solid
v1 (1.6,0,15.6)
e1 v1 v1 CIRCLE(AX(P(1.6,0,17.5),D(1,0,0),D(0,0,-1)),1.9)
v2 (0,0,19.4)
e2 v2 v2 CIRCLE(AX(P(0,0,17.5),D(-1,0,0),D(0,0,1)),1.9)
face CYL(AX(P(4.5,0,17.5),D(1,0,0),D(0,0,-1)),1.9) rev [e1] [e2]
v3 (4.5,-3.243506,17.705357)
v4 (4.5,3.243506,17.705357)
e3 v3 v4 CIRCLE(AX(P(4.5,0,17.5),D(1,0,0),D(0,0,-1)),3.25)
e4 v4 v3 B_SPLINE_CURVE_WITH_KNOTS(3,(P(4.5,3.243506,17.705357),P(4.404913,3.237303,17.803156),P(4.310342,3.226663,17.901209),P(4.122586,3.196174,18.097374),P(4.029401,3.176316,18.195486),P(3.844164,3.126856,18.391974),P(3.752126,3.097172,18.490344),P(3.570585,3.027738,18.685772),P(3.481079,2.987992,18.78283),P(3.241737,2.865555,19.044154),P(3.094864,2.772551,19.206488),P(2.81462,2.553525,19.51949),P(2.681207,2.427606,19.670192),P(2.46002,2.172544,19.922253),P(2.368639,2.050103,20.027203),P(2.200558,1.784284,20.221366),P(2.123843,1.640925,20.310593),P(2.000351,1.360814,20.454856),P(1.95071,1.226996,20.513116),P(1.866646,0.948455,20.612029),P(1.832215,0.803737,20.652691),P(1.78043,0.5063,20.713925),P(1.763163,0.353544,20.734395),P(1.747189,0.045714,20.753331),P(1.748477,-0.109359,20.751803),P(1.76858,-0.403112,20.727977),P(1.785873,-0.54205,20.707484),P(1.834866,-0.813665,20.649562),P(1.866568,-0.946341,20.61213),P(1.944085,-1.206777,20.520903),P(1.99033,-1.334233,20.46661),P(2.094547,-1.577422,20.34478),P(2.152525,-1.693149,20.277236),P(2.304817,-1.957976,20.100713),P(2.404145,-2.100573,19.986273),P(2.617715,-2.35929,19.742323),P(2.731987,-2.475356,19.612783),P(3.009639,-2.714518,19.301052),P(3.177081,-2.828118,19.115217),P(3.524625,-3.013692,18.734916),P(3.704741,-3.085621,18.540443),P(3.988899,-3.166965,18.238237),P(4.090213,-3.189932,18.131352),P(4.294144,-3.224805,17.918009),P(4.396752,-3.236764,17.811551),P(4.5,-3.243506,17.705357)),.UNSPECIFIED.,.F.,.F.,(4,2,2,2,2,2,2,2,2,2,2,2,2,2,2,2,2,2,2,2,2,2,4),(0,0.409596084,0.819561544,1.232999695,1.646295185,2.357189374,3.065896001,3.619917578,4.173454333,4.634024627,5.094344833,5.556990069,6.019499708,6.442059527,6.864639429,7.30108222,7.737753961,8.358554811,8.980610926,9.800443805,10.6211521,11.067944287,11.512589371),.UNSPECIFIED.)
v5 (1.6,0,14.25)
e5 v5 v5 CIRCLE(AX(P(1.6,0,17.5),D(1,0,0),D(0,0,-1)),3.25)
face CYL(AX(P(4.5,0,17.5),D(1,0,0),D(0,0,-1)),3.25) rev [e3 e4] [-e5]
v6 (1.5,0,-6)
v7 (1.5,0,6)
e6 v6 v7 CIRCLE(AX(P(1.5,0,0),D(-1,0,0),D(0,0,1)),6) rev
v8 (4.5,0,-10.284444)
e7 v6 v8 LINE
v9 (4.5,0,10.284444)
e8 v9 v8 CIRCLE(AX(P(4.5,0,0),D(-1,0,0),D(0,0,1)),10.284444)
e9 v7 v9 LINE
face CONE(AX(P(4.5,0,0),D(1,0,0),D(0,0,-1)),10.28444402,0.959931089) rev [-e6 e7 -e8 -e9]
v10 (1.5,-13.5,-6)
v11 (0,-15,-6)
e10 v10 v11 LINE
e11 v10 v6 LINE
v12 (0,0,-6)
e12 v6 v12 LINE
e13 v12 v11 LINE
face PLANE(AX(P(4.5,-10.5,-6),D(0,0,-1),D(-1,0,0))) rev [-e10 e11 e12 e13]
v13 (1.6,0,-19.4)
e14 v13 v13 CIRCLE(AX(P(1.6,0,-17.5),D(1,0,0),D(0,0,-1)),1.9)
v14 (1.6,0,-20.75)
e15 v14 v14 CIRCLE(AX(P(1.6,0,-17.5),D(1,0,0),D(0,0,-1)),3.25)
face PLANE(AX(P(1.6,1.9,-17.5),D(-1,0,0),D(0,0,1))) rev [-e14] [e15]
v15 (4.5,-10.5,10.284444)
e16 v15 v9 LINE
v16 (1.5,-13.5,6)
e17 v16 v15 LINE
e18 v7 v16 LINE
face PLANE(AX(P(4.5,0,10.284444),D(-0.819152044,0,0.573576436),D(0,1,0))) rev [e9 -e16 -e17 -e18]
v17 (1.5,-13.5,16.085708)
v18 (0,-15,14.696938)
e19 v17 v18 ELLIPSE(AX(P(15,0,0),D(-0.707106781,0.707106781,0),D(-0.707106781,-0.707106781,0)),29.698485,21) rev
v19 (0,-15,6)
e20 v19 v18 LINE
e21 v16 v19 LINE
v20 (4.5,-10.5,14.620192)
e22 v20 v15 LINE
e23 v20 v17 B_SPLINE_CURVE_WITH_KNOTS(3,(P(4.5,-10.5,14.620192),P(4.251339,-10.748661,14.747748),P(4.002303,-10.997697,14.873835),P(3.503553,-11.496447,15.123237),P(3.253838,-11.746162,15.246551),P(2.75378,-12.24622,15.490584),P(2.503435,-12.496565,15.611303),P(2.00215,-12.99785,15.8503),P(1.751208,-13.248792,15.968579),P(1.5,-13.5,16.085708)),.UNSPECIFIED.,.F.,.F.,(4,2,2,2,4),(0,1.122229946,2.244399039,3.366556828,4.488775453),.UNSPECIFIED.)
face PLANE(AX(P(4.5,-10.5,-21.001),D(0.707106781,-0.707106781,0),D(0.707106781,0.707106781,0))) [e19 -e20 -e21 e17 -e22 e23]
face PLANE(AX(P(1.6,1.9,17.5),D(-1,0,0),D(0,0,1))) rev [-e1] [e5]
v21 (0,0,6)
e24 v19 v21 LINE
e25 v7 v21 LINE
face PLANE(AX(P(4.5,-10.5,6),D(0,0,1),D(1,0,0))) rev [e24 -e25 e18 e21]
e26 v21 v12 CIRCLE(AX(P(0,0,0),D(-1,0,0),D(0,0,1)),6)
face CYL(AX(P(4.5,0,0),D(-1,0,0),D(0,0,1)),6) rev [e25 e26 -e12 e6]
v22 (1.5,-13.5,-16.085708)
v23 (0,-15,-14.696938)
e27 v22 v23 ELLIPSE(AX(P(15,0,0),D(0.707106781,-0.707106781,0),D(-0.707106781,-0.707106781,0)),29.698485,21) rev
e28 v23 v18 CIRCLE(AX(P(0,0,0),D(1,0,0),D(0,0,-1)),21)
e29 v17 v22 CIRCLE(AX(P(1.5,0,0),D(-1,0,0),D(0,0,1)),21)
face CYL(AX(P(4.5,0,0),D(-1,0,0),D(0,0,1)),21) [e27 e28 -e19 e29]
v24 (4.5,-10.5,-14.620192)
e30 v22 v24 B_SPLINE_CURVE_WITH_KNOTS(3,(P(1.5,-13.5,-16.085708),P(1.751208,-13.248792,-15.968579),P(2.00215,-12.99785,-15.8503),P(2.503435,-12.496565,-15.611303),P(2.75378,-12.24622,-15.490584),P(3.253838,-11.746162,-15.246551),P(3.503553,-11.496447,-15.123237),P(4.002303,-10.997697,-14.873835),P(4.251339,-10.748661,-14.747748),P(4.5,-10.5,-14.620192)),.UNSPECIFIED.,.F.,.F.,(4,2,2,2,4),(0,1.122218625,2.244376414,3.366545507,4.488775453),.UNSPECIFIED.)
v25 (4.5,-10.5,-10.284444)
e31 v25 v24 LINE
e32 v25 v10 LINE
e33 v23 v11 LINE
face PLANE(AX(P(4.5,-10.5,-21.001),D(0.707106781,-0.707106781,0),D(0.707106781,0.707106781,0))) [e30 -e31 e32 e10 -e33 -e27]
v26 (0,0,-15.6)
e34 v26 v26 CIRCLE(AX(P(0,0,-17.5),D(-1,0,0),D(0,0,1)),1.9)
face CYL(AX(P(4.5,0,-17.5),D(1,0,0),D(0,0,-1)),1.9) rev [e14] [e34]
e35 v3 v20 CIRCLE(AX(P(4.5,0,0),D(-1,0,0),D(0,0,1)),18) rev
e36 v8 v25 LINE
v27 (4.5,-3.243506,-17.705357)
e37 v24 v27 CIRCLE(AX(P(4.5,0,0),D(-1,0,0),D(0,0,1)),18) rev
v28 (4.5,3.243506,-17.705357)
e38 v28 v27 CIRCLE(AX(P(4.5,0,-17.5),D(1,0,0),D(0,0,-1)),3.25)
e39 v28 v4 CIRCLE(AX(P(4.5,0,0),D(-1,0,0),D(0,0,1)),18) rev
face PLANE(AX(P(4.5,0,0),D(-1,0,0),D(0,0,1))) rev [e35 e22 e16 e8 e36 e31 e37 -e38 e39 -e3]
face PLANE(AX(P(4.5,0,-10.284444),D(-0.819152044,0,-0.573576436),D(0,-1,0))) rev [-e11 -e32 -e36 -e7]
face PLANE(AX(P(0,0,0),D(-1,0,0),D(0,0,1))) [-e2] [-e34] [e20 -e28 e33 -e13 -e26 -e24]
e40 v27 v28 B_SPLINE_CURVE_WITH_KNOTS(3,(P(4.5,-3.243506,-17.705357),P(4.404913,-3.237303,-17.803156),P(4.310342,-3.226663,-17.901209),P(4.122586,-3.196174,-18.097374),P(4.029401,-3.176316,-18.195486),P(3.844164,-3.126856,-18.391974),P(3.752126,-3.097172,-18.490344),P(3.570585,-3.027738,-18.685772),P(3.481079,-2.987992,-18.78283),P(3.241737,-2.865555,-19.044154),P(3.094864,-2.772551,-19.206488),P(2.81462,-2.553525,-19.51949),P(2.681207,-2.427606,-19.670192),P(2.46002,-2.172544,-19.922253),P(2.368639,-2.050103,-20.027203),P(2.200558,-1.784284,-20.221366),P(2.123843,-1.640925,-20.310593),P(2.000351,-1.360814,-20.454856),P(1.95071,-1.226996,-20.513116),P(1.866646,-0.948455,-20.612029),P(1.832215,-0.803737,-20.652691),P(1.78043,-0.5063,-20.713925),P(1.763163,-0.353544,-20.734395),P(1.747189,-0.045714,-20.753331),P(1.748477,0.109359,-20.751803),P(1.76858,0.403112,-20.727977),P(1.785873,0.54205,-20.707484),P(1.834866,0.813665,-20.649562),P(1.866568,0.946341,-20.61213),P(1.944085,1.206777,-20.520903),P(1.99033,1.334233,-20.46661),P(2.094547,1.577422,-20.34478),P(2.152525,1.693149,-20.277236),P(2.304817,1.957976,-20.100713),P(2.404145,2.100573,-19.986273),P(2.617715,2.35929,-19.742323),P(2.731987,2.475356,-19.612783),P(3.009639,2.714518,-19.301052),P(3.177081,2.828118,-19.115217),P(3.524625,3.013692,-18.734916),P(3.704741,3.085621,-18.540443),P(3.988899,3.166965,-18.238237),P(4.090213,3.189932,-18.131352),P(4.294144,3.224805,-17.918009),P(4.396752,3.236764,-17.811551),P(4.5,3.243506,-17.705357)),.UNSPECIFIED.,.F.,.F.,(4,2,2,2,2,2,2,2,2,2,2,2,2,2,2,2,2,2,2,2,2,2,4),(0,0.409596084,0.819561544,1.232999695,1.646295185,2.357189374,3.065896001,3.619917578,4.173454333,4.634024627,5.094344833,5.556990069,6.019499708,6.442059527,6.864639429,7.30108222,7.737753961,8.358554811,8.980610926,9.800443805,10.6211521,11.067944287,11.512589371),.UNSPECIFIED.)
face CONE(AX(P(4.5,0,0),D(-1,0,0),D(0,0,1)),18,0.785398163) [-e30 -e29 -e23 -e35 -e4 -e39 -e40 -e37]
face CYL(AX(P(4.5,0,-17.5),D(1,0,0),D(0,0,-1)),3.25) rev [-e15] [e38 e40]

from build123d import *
from OCP.BRepFilletAPI import BRepFilletAPI_MakeChamfer

# Parameters (mm, degrees)
BOSS_EXTRUDE1_DEPTH                                 = 4.5
BOSS_EXTRUDE2_REACH                                 = 32.037
BOSS_EXTRUDE2_END_RADIUS                            = 21
BOSS_EXTRUDE2_DIRECTION_2_REACH                     = 32.037
BOSS_EXTRUDE2_DIRECTION_2_END_RADIUS                = 21
CUT_EXTRUDE1_REACH                                  = 32.037
CUT_EXTRUDE1_DIRECTION_2_REACH                      = 32.037
CBORE_FOR_M3_HEX_SOCKET_HEAD_CAP_SCREW1_D           = 3.8
CBORE_FOR_M3_HEX_SOCKET_HEAD_CAP_SCREW1_DEPTH       = 7
CBORE_FOR_M3_HEX_SOCKET_HEAD_CAP_SCREW1_CBORE_D     = 6.5
CBORE_FOR_M3_HEX_SOCKET_HEAD_CAP_SCREW1_CBORE_DEPTH = 2.9
CBORE_FOR_M3_HEX_SOCKET_HEAD_CAP_SCREW1_TIP         = 1.141635176
CHAMFER1_SIZE                                       = 3
CHAMFER1_SIZE2                                      = 4.28444402
CHAMFER2_SIZE                                       = 3


with BuildPart() as part:
    # Sketch1 → Boss-Extrude1 (new body)
    with BuildSketch(Plane(origin=(0, 0, 0), x_dir=(0, 0, -1), z_dir=(1, 0, 0))):
        with BuildLine():
            Line((-6, -10.5), (-6, 0))
            ThreePointArc((-6, 0), (0, 6), (6, 0))
            Line((6, 0), (6, -10.5))
            Line((6, -10.5), (18.186533479, -10.5))
            ThreePointArc((18.186533479, -10.5), (0, 21), (-18.186533479, -10.5))
            Line((-18.186533479, -10.5), (-6, -10.5))
        make_face()
    extrude(amount=BOSS_EXTRUDE1_DEPTH)

    # Boss-Extrude2: up to this cylinder (the profile starts inside it)
    boss_extrude2_end = Plane(origin=(1.5, 0, 0), z_dir=(-1, 0, 0)) * Cylinder(BOSS_EXTRUDE2_END_RADIUS, 107.074, mode=Mode.PRIVATE)
    # Sketch2 → Boss-Extrude2 (add, up to the surface)
    with BuildSketch(Plane.XY, mode=Mode.PRIVATE) as boss_extrude2_sk1:
        Polygon((4.5, -10.5), (0, -15), (0, -10.5), align=None)
    boss_extrude2_tool1 = extrude(boss_extrude2_sk1.sketch, amount=-BOSS_EXTRUDE2_REACH, mode=Mode.PRIVATE) & boss_extrude2_end
    add(boss_extrude2_tool1.solids().sort_by_distance((1.5, -12, 0))[0])

    # Boss-Extrude2 direction 2: up to this cylinder (the profile starts inside it)
    boss_extrude2_direction_2_end = Plane(origin=(1.5, 0, 0), z_dir=(-1, 0, 0)) * Cylinder(BOSS_EXTRUDE2_DIRECTION_2_END_RADIUS, 107.074, mode=Mode.PRIVATE)
    # Sketch2 → Boss-Extrude2 direction 2 (add, up to the surface)
    with BuildSketch(Plane.XY, mode=Mode.PRIVATE) as boss_extrude2_direction_2_sk1:
        Polygon((4.5, -10.5), (0, -15), (0, -10.5), align=None)
    boss_extrude2_direction_2_tool1 = extrude(boss_extrude2_direction_2_sk1.sketch, amount=BOSS_EXTRUDE2_DIRECTION_2_REACH, mode=Mode.PRIVATE) & boss_extrude2_direction_2_end
    add(boss_extrude2_direction_2_tool1.solids().sort_by_distance((1.5, -12, 0))[0])

    # Cut-Extrude1: up to this face of the body (flat: up to its plane)
    cut_extrude1_end = Plane(part.part.faces().sort_by_distance((2.25, -5.25, -6))[0])
    # Sketch2<2> → Cut-Extrude1 (cut, up to the picked face)
    with BuildSketch(Plane.XY, mode=Mode.PRIVATE) as cut_extrude1_sk1:
        Polygon((4.5, -10.5), (0, -15), (0, -10.5), align=None)
    cut_extrude1_tool1 = split(extrude(cut_extrude1_sk1.sketch, amount=-CUT_EXTRUDE1_REACH, mode=Mode.PRIVATE), bisect_by=cut_extrude1_end, keep=Keep.BOTH, mode=Mode.PRIVATE)
    add(cut_extrude1_tool1.solids().sort_by(Axis((1.5, -12, 0), (0, 0, -1)))[0], mode=Mode.SUBTRACT)

    # Cut-Extrude1 direction 2: up to this face of the body (flat: up to its plane)
    cut_extrude1_direction_2_end = Plane(part.part.faces().sort_by_distance((2.25, -5.25, 6))[0])
    # Sketch2<2> → Cut-Extrude1 direction 2 (cut, up to the picked face)
    with BuildSketch(Plane.XY, mode=Mode.PRIVATE) as cut_extrude1_direction_2_sk1:
        Polygon((4.5, -10.5), (0, -15), (0, -10.5), align=None)
    cut_extrude1_direction_2_tool1 = split(extrude(cut_extrude1_direction_2_sk1.sketch, amount=CUT_EXTRUDE1_DIRECTION_2_REACH, mode=Mode.PRIVATE), bisect_by=cut_extrude1_direction_2_end, keep=Keep.BOTH, mode=Mode.PRIVATE)
    add(cut_extrude1_direction_2_tool1.solids().sort_by(Axis((1.5, -12, 0), (0, 0, 1)))[0], mode=Mode.SUBTRACT)

    # CBORE for M3 Hex Socket Head Cap Screw1
    with Locations(Plane(origin=(4.5, 0, 0), x_dir=(0, 0, -1), z_dir=(1, 0, 0))):
        with Locations((-17.5, 0), (17.5, 0)):
            CounterBoreHole(CBORE_FOR_M3_HEX_SOCKET_HEAD_CAP_SCREW1_D / 2, CBORE_FOR_M3_HEX_SOCKET_HEAD_CAP_SCREW1_CBORE_D / 2, CBORE_FOR_M3_HEX_SOCKET_HEAD_CAP_SCREW1_CBORE_DEPTH, depth=CBORE_FOR_M3_HEX_SOCKET_HEAD_CAP_SCREW1_DEPTH)
            with Locations((0, 0, -(CBORE_FOR_M3_HEX_SOCKET_HEAD_CAP_SCREW1_DEPTH + CBORE_FOR_M3_HEX_SOCKET_HEAD_CAP_SCREW1_TIP / 2))):  # 118° drill point
                Cone(0, CBORE_FOR_M3_HEX_SOCKET_HEAD_CAP_SCREW1_D / 2, CBORE_FOR_M3_HEX_SOCKET_HEAD_CAP_SCREW1_TIP, mode=Mode.SUBTRACT)

    # Chamfer1: one chamfer whose edges measure the first distance from different faces: ONE call of the kernel's chamfer builder (chamfer() names one face for all edges)
    chamfer1_edges_1 = [part.edges().sort_by_distance(p)[0] for p in [
        (4.5, -5.25, 6),
    ]]
    chamfer1_side_1 = [part.faces().sort_by_distance(p)[0] for p in [
        (2.117647059, -6.441176471, 6),
    ]]
    chamfer1_edges_2 = [part.edges().sort_by_distance(p)[0] for p in [
        (4.5, 6, 0),
    ]]
    chamfer1_side_2 = [part.faces().sort_by_distance(p)[0] for p in [
        (2.25, 6, 0),
    ]]
    chamfer1_edges_3 = [part.edges().sort_by_distance(p)[0] for p in [
        (4.5, -5.25, -6),
    ]]
    chamfer1_side_3 = [part.faces().sort_by_distance(p)[0] for p in [
        (2.117647059, -6.441176471, -6),
    ]]
    chamfer1 = BRepFilletAPI_MakeChamfer(part.part.solid().wrapped)
    for e in chamfer1_edges_1:
        chamfer1.Add(CHAMFER1_SIZE, CHAMFER1_SIZE2, e.wrapped, chamfer1_side_1[0].wrapped)  # the first distance lies on this face
    for e in chamfer1_edges_2:
        chamfer1.Add(CHAMFER1_SIZE, CHAMFER1_SIZE2, e.wrapped, chamfer1_side_2[0].wrapped)  # the first distance lies on this face
    for e in chamfer1_edges_3:
        chamfer1.Add(CHAMFER1_SIZE, CHAMFER1_SIZE2, e.wrapped, chamfer1_side_3[0].wrapped)  # the first distance lies on this face
    add(Compound.cast(chamfer1.Shape()), mode=Mode.REPLACE)

    # Chamfer2
    # the kernel refuses this chamfer: 3 mm, written as the material it takes off along each edge
    with BuildSketch(Plane(origin=(4.5, 0, 0), x_dir=(0, -0.7783499423883817, -0.6278306835317966), z_dir=(0, -0.6278306835317966, 0.7783499423883817))) as chamfer2_piece_1:
        Polygon((21 - CHAMFER2_SIZE, 0), (21, -CHAMFER2_SIZE), (21, 0), align=None)
    revolve(axis=Axis((4.5, 0, 0), (1, 0, 0)), revolution_arc=282.219489944, mode=Mode.SUBTRACT)


solid = part.part
